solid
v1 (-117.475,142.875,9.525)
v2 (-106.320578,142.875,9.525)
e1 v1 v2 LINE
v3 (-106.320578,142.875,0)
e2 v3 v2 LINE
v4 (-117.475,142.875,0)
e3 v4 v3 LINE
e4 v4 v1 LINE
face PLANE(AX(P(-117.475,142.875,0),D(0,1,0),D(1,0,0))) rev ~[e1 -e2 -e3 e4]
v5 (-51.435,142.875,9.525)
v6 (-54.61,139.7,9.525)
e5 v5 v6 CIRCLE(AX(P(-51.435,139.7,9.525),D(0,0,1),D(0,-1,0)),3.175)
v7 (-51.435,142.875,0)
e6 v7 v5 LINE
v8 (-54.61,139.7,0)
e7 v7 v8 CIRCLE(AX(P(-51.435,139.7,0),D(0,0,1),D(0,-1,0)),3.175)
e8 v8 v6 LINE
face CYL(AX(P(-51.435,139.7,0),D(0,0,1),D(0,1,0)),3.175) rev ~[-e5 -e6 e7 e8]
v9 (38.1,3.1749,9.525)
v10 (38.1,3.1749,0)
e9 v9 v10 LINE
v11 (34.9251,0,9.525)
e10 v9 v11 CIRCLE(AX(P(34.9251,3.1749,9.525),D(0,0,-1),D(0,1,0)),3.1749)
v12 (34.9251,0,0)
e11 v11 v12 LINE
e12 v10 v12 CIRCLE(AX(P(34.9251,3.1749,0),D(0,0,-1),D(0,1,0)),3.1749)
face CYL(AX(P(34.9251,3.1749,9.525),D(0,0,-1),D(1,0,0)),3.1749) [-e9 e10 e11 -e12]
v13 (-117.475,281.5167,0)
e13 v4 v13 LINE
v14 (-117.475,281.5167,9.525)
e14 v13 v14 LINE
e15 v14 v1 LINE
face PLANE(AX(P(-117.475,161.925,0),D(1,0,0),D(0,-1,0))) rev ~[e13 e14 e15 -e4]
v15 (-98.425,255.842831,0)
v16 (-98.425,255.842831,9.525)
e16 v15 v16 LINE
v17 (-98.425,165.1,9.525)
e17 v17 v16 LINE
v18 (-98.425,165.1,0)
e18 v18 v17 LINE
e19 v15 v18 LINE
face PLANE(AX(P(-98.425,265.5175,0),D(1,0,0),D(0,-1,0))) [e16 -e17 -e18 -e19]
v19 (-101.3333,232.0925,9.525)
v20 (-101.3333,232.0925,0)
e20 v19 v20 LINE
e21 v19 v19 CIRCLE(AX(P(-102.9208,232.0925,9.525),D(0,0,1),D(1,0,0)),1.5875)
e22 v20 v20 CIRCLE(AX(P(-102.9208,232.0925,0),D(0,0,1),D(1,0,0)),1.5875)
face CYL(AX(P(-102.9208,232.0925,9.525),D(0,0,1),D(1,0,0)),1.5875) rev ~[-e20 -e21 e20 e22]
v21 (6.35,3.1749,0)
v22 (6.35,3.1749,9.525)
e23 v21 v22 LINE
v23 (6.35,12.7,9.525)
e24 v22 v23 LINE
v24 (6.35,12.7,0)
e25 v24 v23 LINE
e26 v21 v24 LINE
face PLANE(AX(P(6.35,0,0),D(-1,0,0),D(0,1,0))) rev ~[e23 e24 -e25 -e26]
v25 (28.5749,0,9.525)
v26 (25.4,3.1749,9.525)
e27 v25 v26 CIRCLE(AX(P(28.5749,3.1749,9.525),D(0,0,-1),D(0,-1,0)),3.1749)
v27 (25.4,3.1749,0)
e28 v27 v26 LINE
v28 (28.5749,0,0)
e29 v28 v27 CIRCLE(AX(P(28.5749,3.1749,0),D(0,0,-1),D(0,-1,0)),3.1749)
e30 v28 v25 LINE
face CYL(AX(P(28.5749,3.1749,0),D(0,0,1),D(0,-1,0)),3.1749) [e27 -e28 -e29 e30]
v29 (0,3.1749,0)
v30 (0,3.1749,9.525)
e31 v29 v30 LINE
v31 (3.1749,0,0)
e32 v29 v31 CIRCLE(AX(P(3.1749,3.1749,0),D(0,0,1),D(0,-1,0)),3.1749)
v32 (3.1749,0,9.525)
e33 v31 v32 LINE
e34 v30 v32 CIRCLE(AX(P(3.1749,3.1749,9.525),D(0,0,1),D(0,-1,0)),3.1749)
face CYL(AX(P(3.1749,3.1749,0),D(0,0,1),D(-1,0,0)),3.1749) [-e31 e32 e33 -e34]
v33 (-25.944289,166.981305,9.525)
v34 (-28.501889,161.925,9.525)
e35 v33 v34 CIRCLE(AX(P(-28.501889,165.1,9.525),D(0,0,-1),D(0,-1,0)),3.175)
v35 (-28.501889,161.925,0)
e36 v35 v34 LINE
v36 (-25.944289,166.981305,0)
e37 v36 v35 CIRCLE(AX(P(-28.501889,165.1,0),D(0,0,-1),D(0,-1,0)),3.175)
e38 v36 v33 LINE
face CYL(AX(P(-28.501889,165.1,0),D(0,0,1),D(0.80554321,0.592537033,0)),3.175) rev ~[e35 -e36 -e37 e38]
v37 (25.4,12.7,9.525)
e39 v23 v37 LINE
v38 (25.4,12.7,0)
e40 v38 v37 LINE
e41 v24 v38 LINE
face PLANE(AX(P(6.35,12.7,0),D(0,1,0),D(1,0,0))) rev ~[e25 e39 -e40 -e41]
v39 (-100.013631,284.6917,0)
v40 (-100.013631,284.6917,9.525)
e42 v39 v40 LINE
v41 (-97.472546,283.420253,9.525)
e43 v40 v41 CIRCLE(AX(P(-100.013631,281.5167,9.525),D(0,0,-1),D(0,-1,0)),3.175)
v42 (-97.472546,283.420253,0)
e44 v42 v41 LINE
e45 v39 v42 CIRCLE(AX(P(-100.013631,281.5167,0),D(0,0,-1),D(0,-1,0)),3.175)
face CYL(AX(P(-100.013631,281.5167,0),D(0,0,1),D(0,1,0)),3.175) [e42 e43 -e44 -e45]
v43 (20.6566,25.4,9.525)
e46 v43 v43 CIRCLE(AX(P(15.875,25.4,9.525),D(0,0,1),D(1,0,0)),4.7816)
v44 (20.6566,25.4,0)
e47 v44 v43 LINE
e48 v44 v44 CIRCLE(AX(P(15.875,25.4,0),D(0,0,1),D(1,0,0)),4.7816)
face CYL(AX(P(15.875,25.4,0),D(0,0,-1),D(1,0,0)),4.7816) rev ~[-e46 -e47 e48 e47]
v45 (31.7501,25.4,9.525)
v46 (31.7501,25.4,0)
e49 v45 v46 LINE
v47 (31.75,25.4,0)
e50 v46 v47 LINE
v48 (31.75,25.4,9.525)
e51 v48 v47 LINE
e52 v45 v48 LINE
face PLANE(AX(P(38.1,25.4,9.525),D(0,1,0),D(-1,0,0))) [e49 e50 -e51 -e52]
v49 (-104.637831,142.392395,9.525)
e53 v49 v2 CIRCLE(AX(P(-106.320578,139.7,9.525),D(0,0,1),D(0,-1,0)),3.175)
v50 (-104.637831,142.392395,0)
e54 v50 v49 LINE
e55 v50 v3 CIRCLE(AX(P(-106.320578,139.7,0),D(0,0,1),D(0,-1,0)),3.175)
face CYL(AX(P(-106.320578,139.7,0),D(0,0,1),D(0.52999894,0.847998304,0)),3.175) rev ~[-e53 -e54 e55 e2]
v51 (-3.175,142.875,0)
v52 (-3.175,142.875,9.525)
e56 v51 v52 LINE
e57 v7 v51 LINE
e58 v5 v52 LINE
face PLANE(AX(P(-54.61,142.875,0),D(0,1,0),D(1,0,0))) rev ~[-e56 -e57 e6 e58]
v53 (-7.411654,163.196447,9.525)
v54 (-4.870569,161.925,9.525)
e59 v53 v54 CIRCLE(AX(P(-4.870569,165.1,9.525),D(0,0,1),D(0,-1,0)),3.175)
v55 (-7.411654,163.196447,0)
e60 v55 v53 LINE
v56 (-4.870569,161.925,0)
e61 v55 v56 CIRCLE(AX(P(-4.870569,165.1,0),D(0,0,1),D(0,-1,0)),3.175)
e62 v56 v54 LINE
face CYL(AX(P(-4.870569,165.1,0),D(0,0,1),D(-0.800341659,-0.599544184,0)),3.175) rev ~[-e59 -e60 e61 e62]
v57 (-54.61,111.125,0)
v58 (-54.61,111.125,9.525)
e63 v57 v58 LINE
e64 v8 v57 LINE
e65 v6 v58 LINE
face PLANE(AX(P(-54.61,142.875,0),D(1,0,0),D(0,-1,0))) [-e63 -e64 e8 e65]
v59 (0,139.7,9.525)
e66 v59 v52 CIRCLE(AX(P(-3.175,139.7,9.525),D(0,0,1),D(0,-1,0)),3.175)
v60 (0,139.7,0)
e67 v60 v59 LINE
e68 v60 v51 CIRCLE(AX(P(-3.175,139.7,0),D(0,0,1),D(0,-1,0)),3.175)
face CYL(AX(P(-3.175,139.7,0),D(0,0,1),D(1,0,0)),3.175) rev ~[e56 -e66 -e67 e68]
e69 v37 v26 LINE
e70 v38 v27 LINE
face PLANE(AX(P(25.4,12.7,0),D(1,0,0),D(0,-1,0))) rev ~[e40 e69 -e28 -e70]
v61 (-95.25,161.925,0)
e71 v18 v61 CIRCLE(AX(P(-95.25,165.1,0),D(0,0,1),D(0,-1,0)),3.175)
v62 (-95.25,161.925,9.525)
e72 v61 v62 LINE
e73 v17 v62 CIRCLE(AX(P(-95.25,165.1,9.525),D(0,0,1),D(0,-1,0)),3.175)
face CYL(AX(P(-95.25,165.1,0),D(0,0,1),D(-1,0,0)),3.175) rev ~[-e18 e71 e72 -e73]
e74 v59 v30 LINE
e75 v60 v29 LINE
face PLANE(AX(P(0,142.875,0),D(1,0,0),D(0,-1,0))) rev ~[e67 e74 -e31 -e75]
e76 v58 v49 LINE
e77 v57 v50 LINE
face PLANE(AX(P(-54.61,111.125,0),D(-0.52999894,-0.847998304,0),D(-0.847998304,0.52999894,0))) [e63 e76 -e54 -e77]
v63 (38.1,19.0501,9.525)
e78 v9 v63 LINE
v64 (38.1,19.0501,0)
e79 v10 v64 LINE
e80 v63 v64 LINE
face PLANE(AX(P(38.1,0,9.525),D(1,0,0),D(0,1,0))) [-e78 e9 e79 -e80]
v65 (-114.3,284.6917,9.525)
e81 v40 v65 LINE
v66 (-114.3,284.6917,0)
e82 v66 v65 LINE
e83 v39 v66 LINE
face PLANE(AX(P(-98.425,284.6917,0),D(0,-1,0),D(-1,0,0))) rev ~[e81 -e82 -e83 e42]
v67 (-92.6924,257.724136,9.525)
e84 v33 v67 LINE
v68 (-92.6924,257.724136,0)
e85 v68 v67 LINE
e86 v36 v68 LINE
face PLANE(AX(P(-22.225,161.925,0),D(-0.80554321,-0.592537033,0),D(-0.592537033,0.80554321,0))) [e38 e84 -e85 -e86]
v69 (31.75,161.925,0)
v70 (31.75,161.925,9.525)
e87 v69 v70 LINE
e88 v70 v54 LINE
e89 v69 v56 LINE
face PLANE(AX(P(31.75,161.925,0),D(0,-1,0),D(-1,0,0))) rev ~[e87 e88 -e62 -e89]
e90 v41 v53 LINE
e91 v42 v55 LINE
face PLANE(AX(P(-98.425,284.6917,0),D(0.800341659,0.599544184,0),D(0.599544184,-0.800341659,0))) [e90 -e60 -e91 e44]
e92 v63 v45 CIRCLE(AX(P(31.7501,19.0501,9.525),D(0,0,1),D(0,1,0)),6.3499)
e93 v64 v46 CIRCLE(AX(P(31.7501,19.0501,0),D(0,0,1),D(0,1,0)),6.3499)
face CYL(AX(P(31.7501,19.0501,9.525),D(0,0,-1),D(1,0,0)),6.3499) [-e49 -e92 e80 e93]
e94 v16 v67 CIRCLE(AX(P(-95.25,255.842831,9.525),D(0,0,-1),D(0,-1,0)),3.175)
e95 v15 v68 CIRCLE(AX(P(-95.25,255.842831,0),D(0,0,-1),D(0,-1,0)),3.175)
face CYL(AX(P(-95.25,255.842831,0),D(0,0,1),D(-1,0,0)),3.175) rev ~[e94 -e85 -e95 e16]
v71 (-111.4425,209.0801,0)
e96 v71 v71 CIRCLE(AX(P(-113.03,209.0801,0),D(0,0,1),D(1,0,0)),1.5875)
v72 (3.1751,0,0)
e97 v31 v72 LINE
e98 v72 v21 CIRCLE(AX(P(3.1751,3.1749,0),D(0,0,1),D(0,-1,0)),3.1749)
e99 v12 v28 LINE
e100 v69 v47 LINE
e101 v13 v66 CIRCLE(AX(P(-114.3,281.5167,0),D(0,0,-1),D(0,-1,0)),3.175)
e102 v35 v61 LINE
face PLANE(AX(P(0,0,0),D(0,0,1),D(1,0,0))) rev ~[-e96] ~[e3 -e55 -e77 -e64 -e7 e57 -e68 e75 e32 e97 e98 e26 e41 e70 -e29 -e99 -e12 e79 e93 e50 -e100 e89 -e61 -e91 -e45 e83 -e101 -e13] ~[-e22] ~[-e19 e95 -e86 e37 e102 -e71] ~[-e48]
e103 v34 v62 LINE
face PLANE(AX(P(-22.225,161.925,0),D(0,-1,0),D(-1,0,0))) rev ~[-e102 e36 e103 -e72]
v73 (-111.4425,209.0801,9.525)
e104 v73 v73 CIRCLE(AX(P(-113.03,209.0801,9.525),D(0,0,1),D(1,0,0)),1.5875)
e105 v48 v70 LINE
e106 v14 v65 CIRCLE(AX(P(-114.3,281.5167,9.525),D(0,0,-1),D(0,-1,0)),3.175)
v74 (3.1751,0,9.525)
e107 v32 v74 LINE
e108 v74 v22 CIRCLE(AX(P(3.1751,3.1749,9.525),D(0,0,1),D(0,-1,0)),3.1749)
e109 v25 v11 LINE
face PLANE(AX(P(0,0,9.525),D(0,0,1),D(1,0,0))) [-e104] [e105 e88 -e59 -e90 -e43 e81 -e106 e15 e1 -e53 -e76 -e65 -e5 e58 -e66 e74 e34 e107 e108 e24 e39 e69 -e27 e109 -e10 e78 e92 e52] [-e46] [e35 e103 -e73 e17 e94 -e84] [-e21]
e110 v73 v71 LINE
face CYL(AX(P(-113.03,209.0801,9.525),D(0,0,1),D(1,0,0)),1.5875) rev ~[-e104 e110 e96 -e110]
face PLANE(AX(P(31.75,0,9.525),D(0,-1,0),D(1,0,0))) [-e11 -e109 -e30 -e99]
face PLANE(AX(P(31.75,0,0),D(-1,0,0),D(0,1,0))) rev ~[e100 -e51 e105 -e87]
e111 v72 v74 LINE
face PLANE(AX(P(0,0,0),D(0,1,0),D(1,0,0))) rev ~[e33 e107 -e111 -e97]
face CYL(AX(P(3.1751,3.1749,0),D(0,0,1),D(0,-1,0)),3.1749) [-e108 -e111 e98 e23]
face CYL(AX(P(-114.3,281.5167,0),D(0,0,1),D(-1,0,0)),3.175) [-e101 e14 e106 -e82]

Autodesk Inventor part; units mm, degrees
ref_plane "YZ Plane" through (0, 0, 0) normal (1, 0, 0) x (0, 1, 0)
ref_plane "XZ Plane" through (0, 0, 0) normal (0, 1, 0) x (-1, 0, 0)
ref_plane "XY Plane" through (0, 0, 0) normal (0, 0, 1) x (1, 0, 0)
ref_plane "Work Plane1" through (0, 0, 9.525) normal (0, 0, 1) x (1, 0, 0)
sketch "Sketch1" plane through (0, 0, 0) normal (0, 0, 1) x (1, 0, 0)
  line L0 (0, 0) -> (6.35, 0)
  line L1 (6.35, 0) -> (6.35, 12.7)
  line L2 (6.35, 12.7) -> (25.4, 12.7)
  line L3 (25.4, 12.7) -> (25.4, 0)
  line L4 (25.4, 0) -> (31.75, 0)
  line L5 (31.75, 0) -> (31.75, 161.925)
  circle A0 centre (15.875, 25.4) radius 4.7816
  line L6 (-117.475, 161.925) -> (-117.475, 142.875)
  line L7 (0, 142.875) -> (0, 0)
  line L8 (-117.475, 142.875) -> (-117.475, 284.6917)
  line L9 (-54.61, 142.875) -> (-54.61, 111.125)
  line L10 (-54.61, 111.125) -> (-105.41, 142.875)
  line L11 (-117.475, 142.875) -> (-105.41, 142.875)
  line L12 (-54.61, 142.875) -> (0, 142.875)
  line L13 (-98.425, 284.6917) -> (-117.475, 284.6917)
  line L14 (-98.425, 265.5175) -> (-98.425, 256.0855)
  line L15 (-98.425, 238.125) -> (-98.425, 161.925)
  line L16 (31.75, 161.925) -> (-6.4592, 161.925)
  line L17 (-22.225, 161.925) -> (-98.425, 161.925)
  line L18 (-98.425, 284.6917) -> (-6.4592, 161.925)
  line L19 (-22.225, 161.925) -> (-98.425, 265.5175)
  line L20 (-98.425, 238.125) -> (-98.425, 256.0855)
  line L21 (31.75, 25.4) -> (31.75, 38.1)
  line L22 (31.75, 38.1) -> (0, 38.1) construction
  point P0 (-98.425, 263.525)
  point P1 (-6.35, 161.925)
  dimension "d0" = 6.35
  dimension "d1" = 12.7
  dimension "d2" = 19.05
  dimension "d3" = 6.35
  dimension "d4" = 161.925
  dimension "d5" = 9.5631
  dimension "d6" = 12.7
  dimension "d7" = 9.525
  dimension "d8" = 149.225
  dimension "d9" = 19.05
  dimension "d12" = 54.61
  dimension "d13" = 31.75
  dimension "d14" = 50.8
  dimension "d34" = 122.7667
  dimension "d37" = 19.05
  dimension "d38" = 19.05
  dimension "d39" = 76.2
  dimension "d40" = 76.2
  dimension "d41" = 19.05
  dimension "d50" = 0.5
  dimension "d51" = 12.7
  dimension "d61" = 12.7
sketch "Sketch2" plane through (0, 0, 9.525) normal (0, 0, 1) x (1, 0, 0)
  line L0 (-98.425, 298.45) -> (-117.475, 298.45) projected
  line L1 (-117.475, 284.6917) -> (-117.475, 142.875) projected
  circle A0 centre (-102.9208, 232.0925) radius 1.5875
  circle A1 centre (-113.03, 209.0801) radius 1.5875
  dimension "d24" = 3.175
  dimension "d25" = 14.5542
  dimension "d26" = 66.3575
  dimension "d27" = 3.175
  dimension "d29" = 89.3699
  dimension "d32" = 4.445
extrude "Extrusion4" add sketch "Sketch1" along normal blind 9.525
extrude "Extrusion5" cut sketch "Sketch2" against normal blind 9.525
fillet "Fillet2" radius 3.175 1 edges at (0, 142.875, 4.7625)
fillet "Fillet3" radius 3.175 1 edges at (-54.61, 142.875, 4.7625)
fillet "Fillet4" radius 3.175 1 edges at (-105.41, 142.875, 4.7625)
fillet "Fillet5" radius 3.175 6 edges at (-117.475, 284.6917, 4.7625) (-98.425, 284.6917, 4.7625) (-6.4592, 161.925, 4.7625) (-22.225, 161.925, 4.7625) (-98.425, 161.925, 4.7625) (-98.425, 265.5175, 4.7625)
sketch "Sketch4" plane through (0, 0, 9.525) normal (0, 0, 1) x (1, 0, 0)
  arc A0 (-97.4725, 283.4202) -> (-100.0136, 284.6917) centre (-100.0136, 281.5167) ccw projected
  line L0 (-100.0136, 284.6917) -> (-114.3, 284.6917) projected
  arc A1 (-114.3, 284.6917) -> (-117.475, 281.5167) centre (-114.3, 281.5167) ccw projected
  line L1 (-117.475, 281.5167) -> (-117.475, 142.875) projected
  line L2 (-117.475, 142.875) -> (-106.3206, 142.875) projected
  arc A2 (-104.6378, 142.3924) -> (-106.3206, 142.875) centre (-106.3206, 139.7) ccw projected
  line L3 (-104.6378, 142.3924) -> (-54.61, 111.125) projected
  line L4 (-54.61, 111.125) -> (-54.61, 139.7) projected
  arc A3 (-51.435, 142.875) -> (-54.61, 139.7) centre (-51.435, 139.7) ccw projected
  line L5 (-51.435, 142.875) -> (-3.175, 142.875) projected
  arc A4 (0, 139.7) -> (-3.175, 142.875) centre (-3.175, 139.7) ccw projected
  line L6 (0, 139.7) -> (0, 0) projected
  line L7 (0, 0) -> (6.35, 0) projected
  line L8 (6.35, 0) -> (6.35, 12.7) projected
  line L9 (6.35, 12.7) -> (25.4, 12.7) projected
  line L10 (25.4, 12.7) -> (25.4, 0) projected
  line L11 (25.4, 0) -> (31.75, 0) projected
  line L12 (31.75, 0) -> (31.75, 161.925) projected
  line L13 (31.75, 161.925) -> (-4.8706, 161.925) projected
  arc A5 (-7.4117, 163.1964) -> (-4.8706, 161.925) centre (-4.8706, 165.1) ccw projected
  line L14 (-7.4117, 163.1964) -> (-97.4725, 283.4202) projected
  line L15 (25.4, 0) -> (38.1, 0)
  line L16 (38.1, 0) -> (38.1, 25.4)
  line L17 (38.1, 25.4) -> (31.75, 25.4)
  dimension "d56" = 12.7
extrude "Extrusion7" add sketch "Sketch4" against normal blind 9.525 contours L17 L16 L15 L12
fillet "Fillet6" radius 3.175 4 edges at (38.1, 0, 4.7625) (25.4, 0, 4.7625) (6.35, 0, 4.7625) (0, 0, 4.7625)
fillet "Fillet7" radius 6.35 1 edges at (38.1, 25.4, 4.7625)
sketch "Sketch5" plane through (0, 0, 9.525) normal (0, 0, 1) x (1, 0, 0)
  arc A0 (38.1, 19.05) -> (31.75, 25.4) centre (31.75, 19.05) ccw projected
  line L0 (31.75, 25.4) -> (31.75, 161.925) projected
  line L1 (31.75, 161.925) -> (-4.8706, 161.925) projected
  arc A1 (-7.4117, 163.1964) -> (-4.8706, 161.925) centre (-4.8706, 165.1) ccw projected
  line L2 (-7.4117, 163.1964) -> (-97.4725, 283.4202) projected
  arc A2 (-97.4725, 283.4202) -> (-100.0136, 284.6917) centre (-100.0136, 281.5167) ccw projected
  line L3 (-100.0136, 284.6917) -> (-114.3, 284.6917) projected
  arc A3 (-114.3, 284.6917) -> (-117.475, 281.5167) centre (-114.3, 281.5167) ccw projected
  line L4 (-117.475, 281.5167) -> (-117.475, 142.875) projected
  line L5 (-117.475, 142.875) -> (-106.3206, 142.875) projected
  arc A4 (-104.6378, 142.3924) -> (-106.3206, 142.875) centre (-106.3206, 139.7) ccw projected
  line L6 (-104.6378, 142.3924) -> (-54.61, 111.125) projected
  line L7 (-54.61, 111.125) -> (-54.61, 139.7) projected
  arc A5 (-51.435, 142.875) -> (-54.61, 139.7) centre (-51.435, 139.7) ccw projected
  line L8 (-51.435, 142.875) -> (-3.175, 142.875) projected
  arc A6 (0, 139.7) -> (-3.175, 142.875) centre (-3.175, 139.7) ccw projected
  line L9 (0, 139.7) -> (0, 3.175) projected
  arc A7 (0, 3.175) -> (6.35, 3.175) centre (3.175, 3.175) ccw projected
  line L10 (6.35, 3.175) -> (6.35, 12.7) projected
  line L11 (6.35, 12.7) -> (25.4, 12.7) projected
  line L12 (25.4, 12.7) -> (25.4, 3.175) projected
  arc A8 (25.4, 3.175) -> (28.575, 0) centre (28.575, 3.175) ccw projected
  line L13 (28.575, 0) -> (34.925, 0) projected
  arc A9 (34.925, 0) -> (38.1, 3.175) centre (34.925, 3.175) ccw projected
  line L14 (38.1, 3.175) -> (38.1, 19.05) projected
  circle A10 centre (15.875, 25.4) radius 4.7816 projected
  line L15 (-98.425, 165.1) -> (-98.425, 255.8428) projected
  arc A11 (-92.6924, 257.7241) -> (-98.425, 255.8428) centre (-95.25, 255.8428) ccw projected
  line L16 (-92.6924, 257.7241) -> (-25.9443, 166.9813) projected
  arc A12 (-28.5019, 161.925) -> (-25.9443, 166.9813) centre (-28.5019, 165.1) ccw projected
  line L17 (-28.5019, 161.925) -> (-95.25, 161.925) projected
  arc A13 (-98.425, 165.1) -> (-95.25, 161.925) centre (-95.25, 165.1) ccw projected
  circle A14 centre (-113.03, 209.0801) radius 1.5875 projected
  circle A15 centre (-102.9208, 232.0925) radius 1.5875 projected
  point P0 (0, 0)
properties part number "Right Climber Hook"
